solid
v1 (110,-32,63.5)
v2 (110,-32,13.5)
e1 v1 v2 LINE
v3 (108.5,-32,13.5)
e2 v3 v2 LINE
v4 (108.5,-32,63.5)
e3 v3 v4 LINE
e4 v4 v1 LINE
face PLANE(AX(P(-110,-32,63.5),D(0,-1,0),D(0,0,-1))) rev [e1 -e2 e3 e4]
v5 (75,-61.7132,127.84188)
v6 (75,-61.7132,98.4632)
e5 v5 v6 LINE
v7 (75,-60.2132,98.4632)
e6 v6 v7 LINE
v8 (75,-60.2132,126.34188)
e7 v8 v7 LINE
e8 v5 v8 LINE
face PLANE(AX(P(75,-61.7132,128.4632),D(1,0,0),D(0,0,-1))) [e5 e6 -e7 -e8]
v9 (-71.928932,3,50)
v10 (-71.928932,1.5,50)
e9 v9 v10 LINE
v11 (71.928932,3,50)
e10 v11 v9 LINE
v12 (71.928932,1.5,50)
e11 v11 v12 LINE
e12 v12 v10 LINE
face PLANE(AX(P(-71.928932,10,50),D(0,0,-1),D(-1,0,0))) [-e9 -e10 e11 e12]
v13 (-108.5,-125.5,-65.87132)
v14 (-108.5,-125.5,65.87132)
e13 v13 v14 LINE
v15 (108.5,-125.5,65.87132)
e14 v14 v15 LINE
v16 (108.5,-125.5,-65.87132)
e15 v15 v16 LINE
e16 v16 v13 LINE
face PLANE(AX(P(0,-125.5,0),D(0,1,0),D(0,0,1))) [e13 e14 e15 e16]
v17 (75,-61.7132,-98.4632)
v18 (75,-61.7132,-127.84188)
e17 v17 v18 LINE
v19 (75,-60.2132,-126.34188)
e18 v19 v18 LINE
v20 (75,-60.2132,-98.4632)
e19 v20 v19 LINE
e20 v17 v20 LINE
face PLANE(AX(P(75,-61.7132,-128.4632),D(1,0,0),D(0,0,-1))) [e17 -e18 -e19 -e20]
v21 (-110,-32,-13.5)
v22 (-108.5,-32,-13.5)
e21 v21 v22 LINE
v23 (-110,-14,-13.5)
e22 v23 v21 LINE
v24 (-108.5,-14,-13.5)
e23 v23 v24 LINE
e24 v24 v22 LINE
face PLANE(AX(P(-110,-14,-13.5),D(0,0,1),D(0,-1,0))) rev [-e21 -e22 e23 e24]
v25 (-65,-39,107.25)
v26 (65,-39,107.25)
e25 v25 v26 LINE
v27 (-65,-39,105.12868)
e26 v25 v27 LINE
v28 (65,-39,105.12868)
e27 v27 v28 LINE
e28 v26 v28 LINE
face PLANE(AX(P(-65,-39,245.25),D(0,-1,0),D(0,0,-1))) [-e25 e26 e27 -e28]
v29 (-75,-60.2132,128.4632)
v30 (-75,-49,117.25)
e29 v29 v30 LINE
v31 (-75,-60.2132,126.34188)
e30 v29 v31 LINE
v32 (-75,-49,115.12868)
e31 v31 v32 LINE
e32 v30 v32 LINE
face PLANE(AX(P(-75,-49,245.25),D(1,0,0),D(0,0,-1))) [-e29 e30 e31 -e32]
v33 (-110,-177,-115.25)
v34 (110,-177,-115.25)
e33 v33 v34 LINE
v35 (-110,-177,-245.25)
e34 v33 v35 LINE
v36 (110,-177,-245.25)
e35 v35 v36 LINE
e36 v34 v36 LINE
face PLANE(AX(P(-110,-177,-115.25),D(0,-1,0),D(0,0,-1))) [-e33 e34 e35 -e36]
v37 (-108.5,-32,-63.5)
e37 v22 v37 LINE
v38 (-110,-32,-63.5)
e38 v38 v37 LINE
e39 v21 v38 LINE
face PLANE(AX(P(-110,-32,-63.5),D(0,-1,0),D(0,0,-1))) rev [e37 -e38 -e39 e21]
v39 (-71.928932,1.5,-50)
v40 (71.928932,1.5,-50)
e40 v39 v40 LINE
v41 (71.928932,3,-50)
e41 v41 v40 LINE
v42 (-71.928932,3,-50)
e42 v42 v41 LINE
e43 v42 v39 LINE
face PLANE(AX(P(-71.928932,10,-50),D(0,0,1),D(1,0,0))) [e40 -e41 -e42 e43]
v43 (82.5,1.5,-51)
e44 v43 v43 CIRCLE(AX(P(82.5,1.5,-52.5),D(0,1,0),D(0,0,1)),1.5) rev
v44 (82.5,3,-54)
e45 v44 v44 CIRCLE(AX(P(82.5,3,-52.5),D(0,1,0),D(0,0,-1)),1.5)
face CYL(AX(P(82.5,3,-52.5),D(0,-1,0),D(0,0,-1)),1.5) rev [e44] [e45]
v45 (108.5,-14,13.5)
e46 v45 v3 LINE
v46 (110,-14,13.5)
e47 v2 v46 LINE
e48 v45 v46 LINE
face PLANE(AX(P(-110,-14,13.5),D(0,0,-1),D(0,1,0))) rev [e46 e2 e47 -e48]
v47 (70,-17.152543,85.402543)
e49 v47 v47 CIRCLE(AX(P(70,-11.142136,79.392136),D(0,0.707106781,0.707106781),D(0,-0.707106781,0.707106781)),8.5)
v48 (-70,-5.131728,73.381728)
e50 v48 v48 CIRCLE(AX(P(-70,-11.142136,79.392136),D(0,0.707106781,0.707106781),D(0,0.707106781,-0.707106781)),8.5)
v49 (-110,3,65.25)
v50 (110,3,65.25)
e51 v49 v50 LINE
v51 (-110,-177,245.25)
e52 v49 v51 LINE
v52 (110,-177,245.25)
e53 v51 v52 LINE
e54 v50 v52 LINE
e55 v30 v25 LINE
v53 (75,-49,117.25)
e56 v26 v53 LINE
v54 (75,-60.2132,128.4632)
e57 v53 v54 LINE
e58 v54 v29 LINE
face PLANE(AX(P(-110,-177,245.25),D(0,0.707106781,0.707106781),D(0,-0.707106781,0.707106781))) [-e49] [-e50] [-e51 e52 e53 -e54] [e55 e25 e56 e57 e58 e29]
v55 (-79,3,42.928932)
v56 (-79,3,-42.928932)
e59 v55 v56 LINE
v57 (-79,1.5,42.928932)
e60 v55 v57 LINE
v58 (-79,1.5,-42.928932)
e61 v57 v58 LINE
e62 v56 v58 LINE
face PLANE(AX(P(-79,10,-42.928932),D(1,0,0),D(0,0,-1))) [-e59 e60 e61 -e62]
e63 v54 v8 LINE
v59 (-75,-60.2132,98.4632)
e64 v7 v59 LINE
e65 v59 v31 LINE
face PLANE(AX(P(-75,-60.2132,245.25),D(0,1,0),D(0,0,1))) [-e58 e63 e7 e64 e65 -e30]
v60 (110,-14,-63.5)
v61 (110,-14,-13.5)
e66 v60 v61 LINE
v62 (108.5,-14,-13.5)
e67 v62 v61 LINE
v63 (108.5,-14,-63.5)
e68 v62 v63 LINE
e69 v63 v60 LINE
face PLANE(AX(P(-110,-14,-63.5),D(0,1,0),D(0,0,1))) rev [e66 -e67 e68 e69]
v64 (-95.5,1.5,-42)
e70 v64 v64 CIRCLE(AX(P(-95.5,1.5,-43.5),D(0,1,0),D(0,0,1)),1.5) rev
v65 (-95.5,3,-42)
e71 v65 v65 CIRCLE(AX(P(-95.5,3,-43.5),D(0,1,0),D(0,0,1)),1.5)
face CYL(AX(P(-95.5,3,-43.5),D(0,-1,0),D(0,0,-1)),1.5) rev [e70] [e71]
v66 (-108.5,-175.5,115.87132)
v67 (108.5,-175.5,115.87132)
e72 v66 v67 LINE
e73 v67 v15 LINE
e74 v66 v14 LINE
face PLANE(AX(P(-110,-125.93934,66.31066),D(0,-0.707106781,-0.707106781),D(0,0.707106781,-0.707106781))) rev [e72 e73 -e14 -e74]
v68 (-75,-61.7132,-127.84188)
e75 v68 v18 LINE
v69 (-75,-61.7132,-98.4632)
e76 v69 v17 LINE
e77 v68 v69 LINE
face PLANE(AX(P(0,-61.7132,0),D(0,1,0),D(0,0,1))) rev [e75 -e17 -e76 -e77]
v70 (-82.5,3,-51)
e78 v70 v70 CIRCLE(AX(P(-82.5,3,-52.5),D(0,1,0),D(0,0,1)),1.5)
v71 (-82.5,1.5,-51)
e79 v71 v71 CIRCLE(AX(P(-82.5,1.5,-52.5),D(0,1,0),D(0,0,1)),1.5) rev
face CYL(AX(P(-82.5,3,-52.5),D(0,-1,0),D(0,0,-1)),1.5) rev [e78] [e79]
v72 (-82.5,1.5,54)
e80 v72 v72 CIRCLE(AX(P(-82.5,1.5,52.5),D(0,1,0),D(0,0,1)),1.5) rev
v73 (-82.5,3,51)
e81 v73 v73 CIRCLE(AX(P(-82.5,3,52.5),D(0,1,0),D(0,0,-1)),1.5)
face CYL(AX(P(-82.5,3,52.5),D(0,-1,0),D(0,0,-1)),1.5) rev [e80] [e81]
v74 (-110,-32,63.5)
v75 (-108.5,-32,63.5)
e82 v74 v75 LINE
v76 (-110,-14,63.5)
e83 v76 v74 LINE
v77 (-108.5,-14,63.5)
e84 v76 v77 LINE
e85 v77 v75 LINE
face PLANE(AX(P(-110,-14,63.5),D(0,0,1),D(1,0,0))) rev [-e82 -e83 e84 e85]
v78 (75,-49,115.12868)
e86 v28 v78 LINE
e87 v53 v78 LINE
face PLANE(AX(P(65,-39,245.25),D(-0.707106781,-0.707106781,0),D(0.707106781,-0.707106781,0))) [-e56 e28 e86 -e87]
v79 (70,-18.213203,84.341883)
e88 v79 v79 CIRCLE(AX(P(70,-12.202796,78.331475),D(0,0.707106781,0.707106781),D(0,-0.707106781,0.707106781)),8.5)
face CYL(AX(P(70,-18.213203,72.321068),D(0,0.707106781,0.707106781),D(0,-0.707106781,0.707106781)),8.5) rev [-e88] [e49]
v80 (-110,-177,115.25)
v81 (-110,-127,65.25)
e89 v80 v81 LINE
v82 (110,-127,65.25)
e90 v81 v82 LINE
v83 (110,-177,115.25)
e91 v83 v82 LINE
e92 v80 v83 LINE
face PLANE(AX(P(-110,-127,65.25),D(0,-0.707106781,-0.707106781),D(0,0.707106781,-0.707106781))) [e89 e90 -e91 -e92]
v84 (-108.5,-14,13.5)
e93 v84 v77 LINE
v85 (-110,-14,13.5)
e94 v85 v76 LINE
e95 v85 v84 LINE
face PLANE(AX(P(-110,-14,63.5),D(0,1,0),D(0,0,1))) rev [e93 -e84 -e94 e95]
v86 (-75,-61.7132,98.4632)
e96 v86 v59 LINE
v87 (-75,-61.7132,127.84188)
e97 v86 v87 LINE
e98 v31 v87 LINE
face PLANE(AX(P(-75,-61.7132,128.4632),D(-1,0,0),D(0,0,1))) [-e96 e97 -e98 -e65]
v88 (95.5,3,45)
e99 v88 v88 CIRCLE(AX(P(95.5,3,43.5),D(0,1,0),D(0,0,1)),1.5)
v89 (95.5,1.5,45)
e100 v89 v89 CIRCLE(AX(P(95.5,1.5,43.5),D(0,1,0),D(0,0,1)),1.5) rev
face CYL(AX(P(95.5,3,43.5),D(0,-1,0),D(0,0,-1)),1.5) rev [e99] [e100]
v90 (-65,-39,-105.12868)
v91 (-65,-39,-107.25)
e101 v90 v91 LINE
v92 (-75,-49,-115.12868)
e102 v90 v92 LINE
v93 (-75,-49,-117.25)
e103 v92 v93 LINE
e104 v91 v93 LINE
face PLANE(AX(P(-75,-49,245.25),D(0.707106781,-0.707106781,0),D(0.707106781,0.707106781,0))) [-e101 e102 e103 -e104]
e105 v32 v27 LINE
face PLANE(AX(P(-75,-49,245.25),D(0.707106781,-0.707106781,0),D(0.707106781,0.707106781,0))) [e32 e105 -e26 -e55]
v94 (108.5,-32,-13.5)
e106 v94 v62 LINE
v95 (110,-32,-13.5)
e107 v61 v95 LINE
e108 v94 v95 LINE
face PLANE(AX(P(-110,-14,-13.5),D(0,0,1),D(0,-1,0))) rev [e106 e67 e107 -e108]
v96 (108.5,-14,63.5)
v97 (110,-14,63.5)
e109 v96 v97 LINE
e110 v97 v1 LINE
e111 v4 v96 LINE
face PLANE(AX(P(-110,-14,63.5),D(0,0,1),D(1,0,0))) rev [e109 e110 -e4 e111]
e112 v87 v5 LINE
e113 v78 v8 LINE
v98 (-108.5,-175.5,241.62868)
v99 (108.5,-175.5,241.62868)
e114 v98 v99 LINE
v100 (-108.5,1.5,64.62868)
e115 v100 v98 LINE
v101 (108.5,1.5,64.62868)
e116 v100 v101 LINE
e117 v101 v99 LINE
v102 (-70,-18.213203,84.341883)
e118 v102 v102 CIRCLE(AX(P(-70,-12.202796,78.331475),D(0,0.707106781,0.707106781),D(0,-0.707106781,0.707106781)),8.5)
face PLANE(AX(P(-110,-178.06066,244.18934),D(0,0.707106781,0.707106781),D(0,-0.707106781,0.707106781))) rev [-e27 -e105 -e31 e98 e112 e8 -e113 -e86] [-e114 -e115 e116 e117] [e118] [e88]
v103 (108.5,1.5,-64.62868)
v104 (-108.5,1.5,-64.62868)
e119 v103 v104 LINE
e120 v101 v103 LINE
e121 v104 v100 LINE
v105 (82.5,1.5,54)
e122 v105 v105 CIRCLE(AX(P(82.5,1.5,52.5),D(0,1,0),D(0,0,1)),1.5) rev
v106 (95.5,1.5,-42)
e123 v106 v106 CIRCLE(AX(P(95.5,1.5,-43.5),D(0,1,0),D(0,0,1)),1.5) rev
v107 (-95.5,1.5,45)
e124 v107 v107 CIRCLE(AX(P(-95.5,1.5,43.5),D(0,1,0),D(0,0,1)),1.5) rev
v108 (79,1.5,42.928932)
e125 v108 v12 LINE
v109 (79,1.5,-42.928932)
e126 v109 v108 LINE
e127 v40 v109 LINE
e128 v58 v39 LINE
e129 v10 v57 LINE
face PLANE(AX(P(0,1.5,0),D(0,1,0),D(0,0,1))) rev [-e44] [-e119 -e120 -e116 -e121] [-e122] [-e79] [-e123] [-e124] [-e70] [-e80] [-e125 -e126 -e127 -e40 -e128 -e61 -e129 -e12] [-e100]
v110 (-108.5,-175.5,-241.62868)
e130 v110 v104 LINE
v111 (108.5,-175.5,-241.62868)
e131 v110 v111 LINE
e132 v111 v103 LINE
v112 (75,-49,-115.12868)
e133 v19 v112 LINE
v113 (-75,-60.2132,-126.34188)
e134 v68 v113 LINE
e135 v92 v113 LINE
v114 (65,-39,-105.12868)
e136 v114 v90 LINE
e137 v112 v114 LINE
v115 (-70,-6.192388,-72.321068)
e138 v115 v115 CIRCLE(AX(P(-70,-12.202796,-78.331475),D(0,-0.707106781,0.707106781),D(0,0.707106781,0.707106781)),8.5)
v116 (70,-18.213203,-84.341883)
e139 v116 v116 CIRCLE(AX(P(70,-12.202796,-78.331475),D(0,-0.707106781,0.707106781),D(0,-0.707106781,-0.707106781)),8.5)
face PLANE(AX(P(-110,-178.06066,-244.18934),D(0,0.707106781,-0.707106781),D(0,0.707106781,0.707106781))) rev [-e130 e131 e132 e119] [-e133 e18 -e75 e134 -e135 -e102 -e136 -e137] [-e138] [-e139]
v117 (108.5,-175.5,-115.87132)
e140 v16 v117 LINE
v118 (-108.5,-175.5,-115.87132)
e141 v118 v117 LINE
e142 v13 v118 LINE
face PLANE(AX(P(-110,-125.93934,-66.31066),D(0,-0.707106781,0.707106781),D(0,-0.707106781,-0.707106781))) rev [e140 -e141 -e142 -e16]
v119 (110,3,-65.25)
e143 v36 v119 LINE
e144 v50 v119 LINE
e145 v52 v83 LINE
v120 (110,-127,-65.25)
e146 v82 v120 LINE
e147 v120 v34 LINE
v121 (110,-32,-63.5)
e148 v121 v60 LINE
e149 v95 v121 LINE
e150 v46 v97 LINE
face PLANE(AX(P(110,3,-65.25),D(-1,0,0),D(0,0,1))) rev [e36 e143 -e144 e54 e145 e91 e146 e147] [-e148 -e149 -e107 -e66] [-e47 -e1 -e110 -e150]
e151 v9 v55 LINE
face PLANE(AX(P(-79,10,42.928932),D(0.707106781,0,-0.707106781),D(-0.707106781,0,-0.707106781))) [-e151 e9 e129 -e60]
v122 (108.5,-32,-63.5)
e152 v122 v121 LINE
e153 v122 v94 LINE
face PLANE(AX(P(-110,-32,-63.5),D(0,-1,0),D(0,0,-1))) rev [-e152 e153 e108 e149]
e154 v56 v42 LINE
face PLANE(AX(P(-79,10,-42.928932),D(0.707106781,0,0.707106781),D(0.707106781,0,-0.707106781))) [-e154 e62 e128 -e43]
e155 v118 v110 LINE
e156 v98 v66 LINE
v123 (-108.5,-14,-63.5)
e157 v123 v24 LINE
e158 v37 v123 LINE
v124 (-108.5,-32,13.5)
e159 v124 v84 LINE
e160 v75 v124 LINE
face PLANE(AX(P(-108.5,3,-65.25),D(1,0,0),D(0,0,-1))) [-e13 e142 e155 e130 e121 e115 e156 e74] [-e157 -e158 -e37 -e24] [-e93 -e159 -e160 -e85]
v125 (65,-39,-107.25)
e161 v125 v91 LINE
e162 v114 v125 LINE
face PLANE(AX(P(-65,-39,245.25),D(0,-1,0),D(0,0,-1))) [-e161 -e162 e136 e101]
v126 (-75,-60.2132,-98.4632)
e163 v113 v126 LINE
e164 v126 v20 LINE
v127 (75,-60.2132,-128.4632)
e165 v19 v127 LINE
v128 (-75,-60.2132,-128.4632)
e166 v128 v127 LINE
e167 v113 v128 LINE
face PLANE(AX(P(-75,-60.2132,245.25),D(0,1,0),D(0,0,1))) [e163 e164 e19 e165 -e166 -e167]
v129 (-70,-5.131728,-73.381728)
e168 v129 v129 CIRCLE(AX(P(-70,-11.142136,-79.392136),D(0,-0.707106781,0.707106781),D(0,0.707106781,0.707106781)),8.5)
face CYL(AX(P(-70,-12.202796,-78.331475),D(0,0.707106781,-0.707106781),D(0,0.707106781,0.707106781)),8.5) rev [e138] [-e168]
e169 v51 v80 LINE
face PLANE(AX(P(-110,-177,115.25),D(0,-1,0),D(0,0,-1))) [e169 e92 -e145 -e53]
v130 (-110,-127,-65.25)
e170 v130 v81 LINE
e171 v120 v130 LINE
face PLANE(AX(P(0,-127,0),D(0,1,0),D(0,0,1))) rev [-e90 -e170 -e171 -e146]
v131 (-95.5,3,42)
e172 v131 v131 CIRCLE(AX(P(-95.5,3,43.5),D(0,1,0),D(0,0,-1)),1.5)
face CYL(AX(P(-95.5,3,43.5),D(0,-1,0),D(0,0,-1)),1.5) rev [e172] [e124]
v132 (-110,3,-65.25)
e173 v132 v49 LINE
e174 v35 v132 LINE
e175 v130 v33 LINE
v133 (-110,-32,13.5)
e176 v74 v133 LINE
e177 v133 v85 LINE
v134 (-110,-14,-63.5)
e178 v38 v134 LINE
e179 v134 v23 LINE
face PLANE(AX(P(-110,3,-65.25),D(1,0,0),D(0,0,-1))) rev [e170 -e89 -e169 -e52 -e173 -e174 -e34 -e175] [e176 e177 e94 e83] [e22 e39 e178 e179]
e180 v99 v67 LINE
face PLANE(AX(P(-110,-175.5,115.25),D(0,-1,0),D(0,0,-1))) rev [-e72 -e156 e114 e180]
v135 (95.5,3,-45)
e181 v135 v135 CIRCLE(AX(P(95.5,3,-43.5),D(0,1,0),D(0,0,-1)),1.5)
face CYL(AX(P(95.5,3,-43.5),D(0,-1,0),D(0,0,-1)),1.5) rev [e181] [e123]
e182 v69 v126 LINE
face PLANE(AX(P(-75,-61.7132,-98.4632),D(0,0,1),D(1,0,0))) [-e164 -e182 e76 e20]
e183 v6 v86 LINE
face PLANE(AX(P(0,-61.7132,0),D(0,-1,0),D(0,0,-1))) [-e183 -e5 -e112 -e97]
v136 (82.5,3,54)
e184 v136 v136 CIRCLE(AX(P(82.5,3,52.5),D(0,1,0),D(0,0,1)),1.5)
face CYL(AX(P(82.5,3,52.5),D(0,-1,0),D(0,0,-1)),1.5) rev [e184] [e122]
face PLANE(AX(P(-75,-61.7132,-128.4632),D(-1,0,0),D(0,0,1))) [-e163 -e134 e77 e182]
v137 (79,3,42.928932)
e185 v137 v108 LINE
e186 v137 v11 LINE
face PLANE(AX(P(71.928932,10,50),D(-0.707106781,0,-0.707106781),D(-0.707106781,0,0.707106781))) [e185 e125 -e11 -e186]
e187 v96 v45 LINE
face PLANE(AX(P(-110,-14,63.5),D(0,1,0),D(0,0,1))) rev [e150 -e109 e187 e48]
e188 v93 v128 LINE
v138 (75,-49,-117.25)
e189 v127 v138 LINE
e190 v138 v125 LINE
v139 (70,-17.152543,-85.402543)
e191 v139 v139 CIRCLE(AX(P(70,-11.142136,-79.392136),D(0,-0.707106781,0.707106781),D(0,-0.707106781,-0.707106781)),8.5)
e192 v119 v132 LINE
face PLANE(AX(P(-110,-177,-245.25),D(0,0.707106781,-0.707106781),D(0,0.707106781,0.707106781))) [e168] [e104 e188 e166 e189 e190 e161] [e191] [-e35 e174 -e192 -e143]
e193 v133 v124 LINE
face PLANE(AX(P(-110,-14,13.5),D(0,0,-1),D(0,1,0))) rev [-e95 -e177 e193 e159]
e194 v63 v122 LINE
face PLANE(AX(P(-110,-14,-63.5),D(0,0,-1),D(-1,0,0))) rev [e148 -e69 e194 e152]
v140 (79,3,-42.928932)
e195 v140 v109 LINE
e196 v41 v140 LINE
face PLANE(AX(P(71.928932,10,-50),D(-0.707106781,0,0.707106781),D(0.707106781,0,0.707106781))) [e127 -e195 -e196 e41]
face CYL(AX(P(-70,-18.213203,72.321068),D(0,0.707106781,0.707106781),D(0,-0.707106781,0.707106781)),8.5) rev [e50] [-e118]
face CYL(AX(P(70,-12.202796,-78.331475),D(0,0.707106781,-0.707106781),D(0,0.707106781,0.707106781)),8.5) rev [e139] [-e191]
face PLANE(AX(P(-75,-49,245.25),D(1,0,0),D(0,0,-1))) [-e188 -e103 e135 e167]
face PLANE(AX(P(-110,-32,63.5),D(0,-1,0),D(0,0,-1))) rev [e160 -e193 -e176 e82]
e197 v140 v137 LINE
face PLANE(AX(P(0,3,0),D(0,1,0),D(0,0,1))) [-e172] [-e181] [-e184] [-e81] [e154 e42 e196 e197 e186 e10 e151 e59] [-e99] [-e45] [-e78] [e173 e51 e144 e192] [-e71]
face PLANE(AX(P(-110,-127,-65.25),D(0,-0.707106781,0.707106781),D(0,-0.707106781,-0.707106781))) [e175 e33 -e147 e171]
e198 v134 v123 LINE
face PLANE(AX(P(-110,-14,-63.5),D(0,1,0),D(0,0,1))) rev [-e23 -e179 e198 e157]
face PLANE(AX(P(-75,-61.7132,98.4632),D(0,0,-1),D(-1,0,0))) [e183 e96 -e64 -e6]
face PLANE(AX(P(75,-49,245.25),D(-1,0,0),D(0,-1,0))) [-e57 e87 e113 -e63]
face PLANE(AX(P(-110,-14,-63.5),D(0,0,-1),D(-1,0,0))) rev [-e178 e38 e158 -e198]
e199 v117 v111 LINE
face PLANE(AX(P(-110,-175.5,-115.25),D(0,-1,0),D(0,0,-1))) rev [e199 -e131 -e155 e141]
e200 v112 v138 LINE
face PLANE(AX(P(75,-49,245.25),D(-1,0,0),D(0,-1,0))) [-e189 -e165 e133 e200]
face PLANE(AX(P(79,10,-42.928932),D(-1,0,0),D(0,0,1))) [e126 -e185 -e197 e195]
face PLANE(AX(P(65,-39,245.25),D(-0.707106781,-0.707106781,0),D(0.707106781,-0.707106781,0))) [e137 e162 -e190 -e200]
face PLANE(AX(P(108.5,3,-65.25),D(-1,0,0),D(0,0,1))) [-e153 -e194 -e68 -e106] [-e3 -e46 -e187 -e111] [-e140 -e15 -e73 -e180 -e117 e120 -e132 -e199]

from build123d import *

# Parameters (mm, degrees)
SKETCH1_W                = 220
SKETCH1_H                = 130.5
BOSS_EXTRUDE1_DEPTH      = 3
SKETCH5_W                = 220
SKETCH5_H                = 130.5
BOSS_EXTRUDE2_DEPTH      = 127
SKETCH6_W                = 220
SKETCH6_H                = 130.5
BOSS_EXTRUDE3_DEPTH      = 1
BOSS_EXTRUDE4_DEPTH      = 110
BOSS_EXTRUDE4_DEPTH_BACK = 110
SHELL2_START             = -108.5
SHELL2_DEPTH             = 217
SKETCH2_R                = 1.5
CUT_EXTRUDE1_DEPTH       = 3
CUT_EXTRUDE2_DEPTH       = 10
CUT_EXTRUDE3_DEPTH       = 322.833128344
CUT_EXTRUDE3_DEPTH_BACK  = 322.833128344
SKETCH7_W                = 50
SKETCH7_H                = 18
SKETCH9_R                = 8.5
CUT_EXTRUDE4_DEPTH       = 10
CUT_EXTRUDE5_DEPTH       = 322.833128344
CUT_EXTRUDE5_DEPTH_BACK  = 322.833128344
SKETCH11_W               = 150
SKETCH11_H               = 30
BOSS_EXTRUDE5_DEPTH      = 1.5
SKETCH12_R               = 8.5
CUT_EXTRUDE6_DEPTH       = 1.5


# Read off the part's stored shape, not the designer's step: Shell2
with BuildPart() as part:
    # Sketch1 → Boss-Extrude1 (new body)
    with BuildSketch(Plane(origin=(0, 0, 0), x_dir=(1, 0, 0), z_dir=(0, 1, 0))):
        Rectangle(SKETCH1_W, SKETCH1_H)
    extrude(amount=BOSS_EXTRUDE1_DEPTH)

    # Sketch5 → Boss-Extrude2 (add)
    with BuildSketch(Plane(origin=(0, 0, 0), x_dir=(1, 0, 0), z_dir=(0, 1, 0))):
        Rectangle(SKETCH5_W, SKETCH5_H)
    extrude(amount=-BOSS_EXTRUDE2_DEPTH)

    # Sketch6 → Boss-Extrude3 (add)
    with BuildSketch(Plane.XZ.offset(127)):
        Rectangle(SKETCH6_W, SKETCH6_H)
    extrude(amount=-BOSS_EXTRUDE3_DEPTH)

    # Sketch8 → Boss-Extrude4 (add, two sides: drawn at the far end of the back side and taken through both)
    with BuildSketch(Plane(origin=(0, 0, 0), x_dir=(0, 0, -1), z_dir=(1, 0, 0)).offset(-BOSS_EXTRUDE4_DEPTH_BACK)):
        Polygon((-65.25, 3), (-65.25, -127), (-115.25, -177), (-245.25, -177), align=None)
        Polygon((245.25, -177), (65.25, 3), (65.25, -127), (115.25, -177), align=None)
    extrude(amount=BOSS_EXTRUDE4_DEPTH + BOSS_EXTRUDE4_DEPTH_BACK)

    # Shell2 outline → Shell2 (cut)
    with BuildSketch(Plane.YZ.offset(SHELL2_START)):
        Polygon((-175.5, -241.628679656), (1.5, -64.628679656), (1.5, 64.628679656), (-175.5, 241.628679656), (-175.5, 115.871320344), (-125.5, 65.871320344), (-125.5, -65.871320344), (-175.5, -115.871320344), align=None)
    extrude(amount=SHELL2_DEPTH, mode=Mode.SUBTRACT)

    # Sketch2 → Cut-Extrude1 (cut)
    with BuildSketch(Plane(origin=(0, 0, 0), x_dir=(1, 0, 0), z_dir=(0, 1, 0))):
        with Locations(Location((-82.5, 52.5, 0), (0, 0, 270))):
            Circle(SKETCH2_R)
        with Locations(Location((-82.5, -52.5, 0), (0, 0, 90))):
            Circle(SKETCH2_R)
        with Locations(Location((82.5, -52.5, 0), (0, 0, 270))):
            Circle(SKETCH2_R)
        with Locations(Location((82.5, 52.5, 0), (0, 0, 90))):
            Circle(SKETCH2_R)
        with Locations(Location((-95.5, 43.5, 0), (0, 0, 270))):
            Circle(SKETCH2_R)
        with Locations(Location((-95.5, -43.5, 0), (0, 0, 90))):
            Circle(SKETCH2_R)
        with Locations(Location((95.5, -43.5, 0), (0, 0, 270))):
            Circle(SKETCH2_R)
        with Locations(Location((95.5, 43.5, 0), (0, 0, 90))):
            Circle(SKETCH2_R)
    extrude(amount=CUT_EXTRUDE1_DEPTH, mode=Mode.SUBTRACT)

    # Sketch4 → Cut-Extrude2 (cut)
    with BuildSketch(Plane(origin=(0, 0, 0), x_dir=(1, 0, 0), z_dir=(0, 1, 0))):
        Polygon((-79, 42.928932188), (-71.928932188, 50), (71.928932188, 50), (79, 42.928932188), (79, -42.928932188), (71.928932188, -50), (-71.928932188, -50), (-79, -42.928932188), align=None)
    extrude(amount=CUT_EXTRUDE2_DEPTH, mode=Mode.SUBTRACT)

    # Sketch7 → Cut-Extrude3 (cut, two sides: drawn at the far end of the back side and taken through both)
    with BuildSketch(Plane(origin=(0, 0, 0), x_dir=(0, 0, -1), z_dir=(1, 0, 0)).offset(-CUT_EXTRUDE3_DEPTH_BACK)):
        with Locations((-38.5, -23)):
            Rectangle(SKETCH7_W, SKETCH7_H)
        with Locations((38.5, -23)):
            Rectangle(SKETCH7_W, SKETCH7_H)
    extrude(amount=CUT_EXTRUDE3_DEPTH + CUT_EXTRUDE3_DEPTH_BACK, mode=Mode.SUBTRACT)

    # Sketch9 → Cut-Extrude4 (cut)
    with BuildSketch(Plane(origin=(0, 34.125, 34.125), x_dir=(1, 0, 0), z_dir=(0, 0.7071067811865435, 0.7071067811865517))):
        with Locations(Location((70, -64.017397129, 0), (0, 0, 270))):
            Circle(SKETCH9_R)
        with Locations(Location((-70, -64.017397129, 0), (0, 0, 270))):
            Circle(SKETCH9_R)
    extrude(amount=-CUT_EXTRUDE4_DEPTH, mode=Mode.SUBTRACT)

    # Sketch10 → Cut-Extrude5 (cut, two sides: drawn at the far end of the back side and taken through both)
    with BuildSketch(Plane.XY.offset(-CUT_EXTRUDE5_DEPTH_BACK)):
        Polygon((-75, -49), (-65, -39), (65, -39), (75, -49), (75, -60.2132), (-75, -60.2132), align=None)
    extrude(amount=CUT_EXTRUDE5_DEPTH + CUT_EXTRUDE5_DEPTH_BACK, mode=Mode.SUBTRACT)

    # Sketch11 → Boss-Extrude5 (add)
    with BuildSketch(Plane(origin=(0, -60.2132, 0), x_dir=(1, 0, 0), z_dir=(0, 1, 0))):
        with Locations((0, -113.4632)):
            Rectangle(SKETCH11_W, SKETCH11_H)
        with Locations((0, 113.4632)):
            Rectangle(SKETCH11_W, SKETCH11_H)
    extrude(amount=-BOSS_EXTRUDE5_DEPTH)

    # Sketch12 → Cut-Extrude6 (cut)
    with BuildSketch(Plane(origin=(0, 19.989962184, -48.260037816), x_dir=(1, 0, 0), z_dir=(0, -0.7071067811865438, 0.7071067811865513))):
        with Locations(Location((70, -44.027434945, 0), (0, 0, 270))):
            Circle(SKETCH12_R)
        with Locations(Location((-70, -44.027434945, 0), (0, 0, 90))):
            Circle(SKETCH12_R)
    extrude(amount=CUT_EXTRUDE6_DEPTH, mode=Mode.SUBTRACT)


solid = part.part
